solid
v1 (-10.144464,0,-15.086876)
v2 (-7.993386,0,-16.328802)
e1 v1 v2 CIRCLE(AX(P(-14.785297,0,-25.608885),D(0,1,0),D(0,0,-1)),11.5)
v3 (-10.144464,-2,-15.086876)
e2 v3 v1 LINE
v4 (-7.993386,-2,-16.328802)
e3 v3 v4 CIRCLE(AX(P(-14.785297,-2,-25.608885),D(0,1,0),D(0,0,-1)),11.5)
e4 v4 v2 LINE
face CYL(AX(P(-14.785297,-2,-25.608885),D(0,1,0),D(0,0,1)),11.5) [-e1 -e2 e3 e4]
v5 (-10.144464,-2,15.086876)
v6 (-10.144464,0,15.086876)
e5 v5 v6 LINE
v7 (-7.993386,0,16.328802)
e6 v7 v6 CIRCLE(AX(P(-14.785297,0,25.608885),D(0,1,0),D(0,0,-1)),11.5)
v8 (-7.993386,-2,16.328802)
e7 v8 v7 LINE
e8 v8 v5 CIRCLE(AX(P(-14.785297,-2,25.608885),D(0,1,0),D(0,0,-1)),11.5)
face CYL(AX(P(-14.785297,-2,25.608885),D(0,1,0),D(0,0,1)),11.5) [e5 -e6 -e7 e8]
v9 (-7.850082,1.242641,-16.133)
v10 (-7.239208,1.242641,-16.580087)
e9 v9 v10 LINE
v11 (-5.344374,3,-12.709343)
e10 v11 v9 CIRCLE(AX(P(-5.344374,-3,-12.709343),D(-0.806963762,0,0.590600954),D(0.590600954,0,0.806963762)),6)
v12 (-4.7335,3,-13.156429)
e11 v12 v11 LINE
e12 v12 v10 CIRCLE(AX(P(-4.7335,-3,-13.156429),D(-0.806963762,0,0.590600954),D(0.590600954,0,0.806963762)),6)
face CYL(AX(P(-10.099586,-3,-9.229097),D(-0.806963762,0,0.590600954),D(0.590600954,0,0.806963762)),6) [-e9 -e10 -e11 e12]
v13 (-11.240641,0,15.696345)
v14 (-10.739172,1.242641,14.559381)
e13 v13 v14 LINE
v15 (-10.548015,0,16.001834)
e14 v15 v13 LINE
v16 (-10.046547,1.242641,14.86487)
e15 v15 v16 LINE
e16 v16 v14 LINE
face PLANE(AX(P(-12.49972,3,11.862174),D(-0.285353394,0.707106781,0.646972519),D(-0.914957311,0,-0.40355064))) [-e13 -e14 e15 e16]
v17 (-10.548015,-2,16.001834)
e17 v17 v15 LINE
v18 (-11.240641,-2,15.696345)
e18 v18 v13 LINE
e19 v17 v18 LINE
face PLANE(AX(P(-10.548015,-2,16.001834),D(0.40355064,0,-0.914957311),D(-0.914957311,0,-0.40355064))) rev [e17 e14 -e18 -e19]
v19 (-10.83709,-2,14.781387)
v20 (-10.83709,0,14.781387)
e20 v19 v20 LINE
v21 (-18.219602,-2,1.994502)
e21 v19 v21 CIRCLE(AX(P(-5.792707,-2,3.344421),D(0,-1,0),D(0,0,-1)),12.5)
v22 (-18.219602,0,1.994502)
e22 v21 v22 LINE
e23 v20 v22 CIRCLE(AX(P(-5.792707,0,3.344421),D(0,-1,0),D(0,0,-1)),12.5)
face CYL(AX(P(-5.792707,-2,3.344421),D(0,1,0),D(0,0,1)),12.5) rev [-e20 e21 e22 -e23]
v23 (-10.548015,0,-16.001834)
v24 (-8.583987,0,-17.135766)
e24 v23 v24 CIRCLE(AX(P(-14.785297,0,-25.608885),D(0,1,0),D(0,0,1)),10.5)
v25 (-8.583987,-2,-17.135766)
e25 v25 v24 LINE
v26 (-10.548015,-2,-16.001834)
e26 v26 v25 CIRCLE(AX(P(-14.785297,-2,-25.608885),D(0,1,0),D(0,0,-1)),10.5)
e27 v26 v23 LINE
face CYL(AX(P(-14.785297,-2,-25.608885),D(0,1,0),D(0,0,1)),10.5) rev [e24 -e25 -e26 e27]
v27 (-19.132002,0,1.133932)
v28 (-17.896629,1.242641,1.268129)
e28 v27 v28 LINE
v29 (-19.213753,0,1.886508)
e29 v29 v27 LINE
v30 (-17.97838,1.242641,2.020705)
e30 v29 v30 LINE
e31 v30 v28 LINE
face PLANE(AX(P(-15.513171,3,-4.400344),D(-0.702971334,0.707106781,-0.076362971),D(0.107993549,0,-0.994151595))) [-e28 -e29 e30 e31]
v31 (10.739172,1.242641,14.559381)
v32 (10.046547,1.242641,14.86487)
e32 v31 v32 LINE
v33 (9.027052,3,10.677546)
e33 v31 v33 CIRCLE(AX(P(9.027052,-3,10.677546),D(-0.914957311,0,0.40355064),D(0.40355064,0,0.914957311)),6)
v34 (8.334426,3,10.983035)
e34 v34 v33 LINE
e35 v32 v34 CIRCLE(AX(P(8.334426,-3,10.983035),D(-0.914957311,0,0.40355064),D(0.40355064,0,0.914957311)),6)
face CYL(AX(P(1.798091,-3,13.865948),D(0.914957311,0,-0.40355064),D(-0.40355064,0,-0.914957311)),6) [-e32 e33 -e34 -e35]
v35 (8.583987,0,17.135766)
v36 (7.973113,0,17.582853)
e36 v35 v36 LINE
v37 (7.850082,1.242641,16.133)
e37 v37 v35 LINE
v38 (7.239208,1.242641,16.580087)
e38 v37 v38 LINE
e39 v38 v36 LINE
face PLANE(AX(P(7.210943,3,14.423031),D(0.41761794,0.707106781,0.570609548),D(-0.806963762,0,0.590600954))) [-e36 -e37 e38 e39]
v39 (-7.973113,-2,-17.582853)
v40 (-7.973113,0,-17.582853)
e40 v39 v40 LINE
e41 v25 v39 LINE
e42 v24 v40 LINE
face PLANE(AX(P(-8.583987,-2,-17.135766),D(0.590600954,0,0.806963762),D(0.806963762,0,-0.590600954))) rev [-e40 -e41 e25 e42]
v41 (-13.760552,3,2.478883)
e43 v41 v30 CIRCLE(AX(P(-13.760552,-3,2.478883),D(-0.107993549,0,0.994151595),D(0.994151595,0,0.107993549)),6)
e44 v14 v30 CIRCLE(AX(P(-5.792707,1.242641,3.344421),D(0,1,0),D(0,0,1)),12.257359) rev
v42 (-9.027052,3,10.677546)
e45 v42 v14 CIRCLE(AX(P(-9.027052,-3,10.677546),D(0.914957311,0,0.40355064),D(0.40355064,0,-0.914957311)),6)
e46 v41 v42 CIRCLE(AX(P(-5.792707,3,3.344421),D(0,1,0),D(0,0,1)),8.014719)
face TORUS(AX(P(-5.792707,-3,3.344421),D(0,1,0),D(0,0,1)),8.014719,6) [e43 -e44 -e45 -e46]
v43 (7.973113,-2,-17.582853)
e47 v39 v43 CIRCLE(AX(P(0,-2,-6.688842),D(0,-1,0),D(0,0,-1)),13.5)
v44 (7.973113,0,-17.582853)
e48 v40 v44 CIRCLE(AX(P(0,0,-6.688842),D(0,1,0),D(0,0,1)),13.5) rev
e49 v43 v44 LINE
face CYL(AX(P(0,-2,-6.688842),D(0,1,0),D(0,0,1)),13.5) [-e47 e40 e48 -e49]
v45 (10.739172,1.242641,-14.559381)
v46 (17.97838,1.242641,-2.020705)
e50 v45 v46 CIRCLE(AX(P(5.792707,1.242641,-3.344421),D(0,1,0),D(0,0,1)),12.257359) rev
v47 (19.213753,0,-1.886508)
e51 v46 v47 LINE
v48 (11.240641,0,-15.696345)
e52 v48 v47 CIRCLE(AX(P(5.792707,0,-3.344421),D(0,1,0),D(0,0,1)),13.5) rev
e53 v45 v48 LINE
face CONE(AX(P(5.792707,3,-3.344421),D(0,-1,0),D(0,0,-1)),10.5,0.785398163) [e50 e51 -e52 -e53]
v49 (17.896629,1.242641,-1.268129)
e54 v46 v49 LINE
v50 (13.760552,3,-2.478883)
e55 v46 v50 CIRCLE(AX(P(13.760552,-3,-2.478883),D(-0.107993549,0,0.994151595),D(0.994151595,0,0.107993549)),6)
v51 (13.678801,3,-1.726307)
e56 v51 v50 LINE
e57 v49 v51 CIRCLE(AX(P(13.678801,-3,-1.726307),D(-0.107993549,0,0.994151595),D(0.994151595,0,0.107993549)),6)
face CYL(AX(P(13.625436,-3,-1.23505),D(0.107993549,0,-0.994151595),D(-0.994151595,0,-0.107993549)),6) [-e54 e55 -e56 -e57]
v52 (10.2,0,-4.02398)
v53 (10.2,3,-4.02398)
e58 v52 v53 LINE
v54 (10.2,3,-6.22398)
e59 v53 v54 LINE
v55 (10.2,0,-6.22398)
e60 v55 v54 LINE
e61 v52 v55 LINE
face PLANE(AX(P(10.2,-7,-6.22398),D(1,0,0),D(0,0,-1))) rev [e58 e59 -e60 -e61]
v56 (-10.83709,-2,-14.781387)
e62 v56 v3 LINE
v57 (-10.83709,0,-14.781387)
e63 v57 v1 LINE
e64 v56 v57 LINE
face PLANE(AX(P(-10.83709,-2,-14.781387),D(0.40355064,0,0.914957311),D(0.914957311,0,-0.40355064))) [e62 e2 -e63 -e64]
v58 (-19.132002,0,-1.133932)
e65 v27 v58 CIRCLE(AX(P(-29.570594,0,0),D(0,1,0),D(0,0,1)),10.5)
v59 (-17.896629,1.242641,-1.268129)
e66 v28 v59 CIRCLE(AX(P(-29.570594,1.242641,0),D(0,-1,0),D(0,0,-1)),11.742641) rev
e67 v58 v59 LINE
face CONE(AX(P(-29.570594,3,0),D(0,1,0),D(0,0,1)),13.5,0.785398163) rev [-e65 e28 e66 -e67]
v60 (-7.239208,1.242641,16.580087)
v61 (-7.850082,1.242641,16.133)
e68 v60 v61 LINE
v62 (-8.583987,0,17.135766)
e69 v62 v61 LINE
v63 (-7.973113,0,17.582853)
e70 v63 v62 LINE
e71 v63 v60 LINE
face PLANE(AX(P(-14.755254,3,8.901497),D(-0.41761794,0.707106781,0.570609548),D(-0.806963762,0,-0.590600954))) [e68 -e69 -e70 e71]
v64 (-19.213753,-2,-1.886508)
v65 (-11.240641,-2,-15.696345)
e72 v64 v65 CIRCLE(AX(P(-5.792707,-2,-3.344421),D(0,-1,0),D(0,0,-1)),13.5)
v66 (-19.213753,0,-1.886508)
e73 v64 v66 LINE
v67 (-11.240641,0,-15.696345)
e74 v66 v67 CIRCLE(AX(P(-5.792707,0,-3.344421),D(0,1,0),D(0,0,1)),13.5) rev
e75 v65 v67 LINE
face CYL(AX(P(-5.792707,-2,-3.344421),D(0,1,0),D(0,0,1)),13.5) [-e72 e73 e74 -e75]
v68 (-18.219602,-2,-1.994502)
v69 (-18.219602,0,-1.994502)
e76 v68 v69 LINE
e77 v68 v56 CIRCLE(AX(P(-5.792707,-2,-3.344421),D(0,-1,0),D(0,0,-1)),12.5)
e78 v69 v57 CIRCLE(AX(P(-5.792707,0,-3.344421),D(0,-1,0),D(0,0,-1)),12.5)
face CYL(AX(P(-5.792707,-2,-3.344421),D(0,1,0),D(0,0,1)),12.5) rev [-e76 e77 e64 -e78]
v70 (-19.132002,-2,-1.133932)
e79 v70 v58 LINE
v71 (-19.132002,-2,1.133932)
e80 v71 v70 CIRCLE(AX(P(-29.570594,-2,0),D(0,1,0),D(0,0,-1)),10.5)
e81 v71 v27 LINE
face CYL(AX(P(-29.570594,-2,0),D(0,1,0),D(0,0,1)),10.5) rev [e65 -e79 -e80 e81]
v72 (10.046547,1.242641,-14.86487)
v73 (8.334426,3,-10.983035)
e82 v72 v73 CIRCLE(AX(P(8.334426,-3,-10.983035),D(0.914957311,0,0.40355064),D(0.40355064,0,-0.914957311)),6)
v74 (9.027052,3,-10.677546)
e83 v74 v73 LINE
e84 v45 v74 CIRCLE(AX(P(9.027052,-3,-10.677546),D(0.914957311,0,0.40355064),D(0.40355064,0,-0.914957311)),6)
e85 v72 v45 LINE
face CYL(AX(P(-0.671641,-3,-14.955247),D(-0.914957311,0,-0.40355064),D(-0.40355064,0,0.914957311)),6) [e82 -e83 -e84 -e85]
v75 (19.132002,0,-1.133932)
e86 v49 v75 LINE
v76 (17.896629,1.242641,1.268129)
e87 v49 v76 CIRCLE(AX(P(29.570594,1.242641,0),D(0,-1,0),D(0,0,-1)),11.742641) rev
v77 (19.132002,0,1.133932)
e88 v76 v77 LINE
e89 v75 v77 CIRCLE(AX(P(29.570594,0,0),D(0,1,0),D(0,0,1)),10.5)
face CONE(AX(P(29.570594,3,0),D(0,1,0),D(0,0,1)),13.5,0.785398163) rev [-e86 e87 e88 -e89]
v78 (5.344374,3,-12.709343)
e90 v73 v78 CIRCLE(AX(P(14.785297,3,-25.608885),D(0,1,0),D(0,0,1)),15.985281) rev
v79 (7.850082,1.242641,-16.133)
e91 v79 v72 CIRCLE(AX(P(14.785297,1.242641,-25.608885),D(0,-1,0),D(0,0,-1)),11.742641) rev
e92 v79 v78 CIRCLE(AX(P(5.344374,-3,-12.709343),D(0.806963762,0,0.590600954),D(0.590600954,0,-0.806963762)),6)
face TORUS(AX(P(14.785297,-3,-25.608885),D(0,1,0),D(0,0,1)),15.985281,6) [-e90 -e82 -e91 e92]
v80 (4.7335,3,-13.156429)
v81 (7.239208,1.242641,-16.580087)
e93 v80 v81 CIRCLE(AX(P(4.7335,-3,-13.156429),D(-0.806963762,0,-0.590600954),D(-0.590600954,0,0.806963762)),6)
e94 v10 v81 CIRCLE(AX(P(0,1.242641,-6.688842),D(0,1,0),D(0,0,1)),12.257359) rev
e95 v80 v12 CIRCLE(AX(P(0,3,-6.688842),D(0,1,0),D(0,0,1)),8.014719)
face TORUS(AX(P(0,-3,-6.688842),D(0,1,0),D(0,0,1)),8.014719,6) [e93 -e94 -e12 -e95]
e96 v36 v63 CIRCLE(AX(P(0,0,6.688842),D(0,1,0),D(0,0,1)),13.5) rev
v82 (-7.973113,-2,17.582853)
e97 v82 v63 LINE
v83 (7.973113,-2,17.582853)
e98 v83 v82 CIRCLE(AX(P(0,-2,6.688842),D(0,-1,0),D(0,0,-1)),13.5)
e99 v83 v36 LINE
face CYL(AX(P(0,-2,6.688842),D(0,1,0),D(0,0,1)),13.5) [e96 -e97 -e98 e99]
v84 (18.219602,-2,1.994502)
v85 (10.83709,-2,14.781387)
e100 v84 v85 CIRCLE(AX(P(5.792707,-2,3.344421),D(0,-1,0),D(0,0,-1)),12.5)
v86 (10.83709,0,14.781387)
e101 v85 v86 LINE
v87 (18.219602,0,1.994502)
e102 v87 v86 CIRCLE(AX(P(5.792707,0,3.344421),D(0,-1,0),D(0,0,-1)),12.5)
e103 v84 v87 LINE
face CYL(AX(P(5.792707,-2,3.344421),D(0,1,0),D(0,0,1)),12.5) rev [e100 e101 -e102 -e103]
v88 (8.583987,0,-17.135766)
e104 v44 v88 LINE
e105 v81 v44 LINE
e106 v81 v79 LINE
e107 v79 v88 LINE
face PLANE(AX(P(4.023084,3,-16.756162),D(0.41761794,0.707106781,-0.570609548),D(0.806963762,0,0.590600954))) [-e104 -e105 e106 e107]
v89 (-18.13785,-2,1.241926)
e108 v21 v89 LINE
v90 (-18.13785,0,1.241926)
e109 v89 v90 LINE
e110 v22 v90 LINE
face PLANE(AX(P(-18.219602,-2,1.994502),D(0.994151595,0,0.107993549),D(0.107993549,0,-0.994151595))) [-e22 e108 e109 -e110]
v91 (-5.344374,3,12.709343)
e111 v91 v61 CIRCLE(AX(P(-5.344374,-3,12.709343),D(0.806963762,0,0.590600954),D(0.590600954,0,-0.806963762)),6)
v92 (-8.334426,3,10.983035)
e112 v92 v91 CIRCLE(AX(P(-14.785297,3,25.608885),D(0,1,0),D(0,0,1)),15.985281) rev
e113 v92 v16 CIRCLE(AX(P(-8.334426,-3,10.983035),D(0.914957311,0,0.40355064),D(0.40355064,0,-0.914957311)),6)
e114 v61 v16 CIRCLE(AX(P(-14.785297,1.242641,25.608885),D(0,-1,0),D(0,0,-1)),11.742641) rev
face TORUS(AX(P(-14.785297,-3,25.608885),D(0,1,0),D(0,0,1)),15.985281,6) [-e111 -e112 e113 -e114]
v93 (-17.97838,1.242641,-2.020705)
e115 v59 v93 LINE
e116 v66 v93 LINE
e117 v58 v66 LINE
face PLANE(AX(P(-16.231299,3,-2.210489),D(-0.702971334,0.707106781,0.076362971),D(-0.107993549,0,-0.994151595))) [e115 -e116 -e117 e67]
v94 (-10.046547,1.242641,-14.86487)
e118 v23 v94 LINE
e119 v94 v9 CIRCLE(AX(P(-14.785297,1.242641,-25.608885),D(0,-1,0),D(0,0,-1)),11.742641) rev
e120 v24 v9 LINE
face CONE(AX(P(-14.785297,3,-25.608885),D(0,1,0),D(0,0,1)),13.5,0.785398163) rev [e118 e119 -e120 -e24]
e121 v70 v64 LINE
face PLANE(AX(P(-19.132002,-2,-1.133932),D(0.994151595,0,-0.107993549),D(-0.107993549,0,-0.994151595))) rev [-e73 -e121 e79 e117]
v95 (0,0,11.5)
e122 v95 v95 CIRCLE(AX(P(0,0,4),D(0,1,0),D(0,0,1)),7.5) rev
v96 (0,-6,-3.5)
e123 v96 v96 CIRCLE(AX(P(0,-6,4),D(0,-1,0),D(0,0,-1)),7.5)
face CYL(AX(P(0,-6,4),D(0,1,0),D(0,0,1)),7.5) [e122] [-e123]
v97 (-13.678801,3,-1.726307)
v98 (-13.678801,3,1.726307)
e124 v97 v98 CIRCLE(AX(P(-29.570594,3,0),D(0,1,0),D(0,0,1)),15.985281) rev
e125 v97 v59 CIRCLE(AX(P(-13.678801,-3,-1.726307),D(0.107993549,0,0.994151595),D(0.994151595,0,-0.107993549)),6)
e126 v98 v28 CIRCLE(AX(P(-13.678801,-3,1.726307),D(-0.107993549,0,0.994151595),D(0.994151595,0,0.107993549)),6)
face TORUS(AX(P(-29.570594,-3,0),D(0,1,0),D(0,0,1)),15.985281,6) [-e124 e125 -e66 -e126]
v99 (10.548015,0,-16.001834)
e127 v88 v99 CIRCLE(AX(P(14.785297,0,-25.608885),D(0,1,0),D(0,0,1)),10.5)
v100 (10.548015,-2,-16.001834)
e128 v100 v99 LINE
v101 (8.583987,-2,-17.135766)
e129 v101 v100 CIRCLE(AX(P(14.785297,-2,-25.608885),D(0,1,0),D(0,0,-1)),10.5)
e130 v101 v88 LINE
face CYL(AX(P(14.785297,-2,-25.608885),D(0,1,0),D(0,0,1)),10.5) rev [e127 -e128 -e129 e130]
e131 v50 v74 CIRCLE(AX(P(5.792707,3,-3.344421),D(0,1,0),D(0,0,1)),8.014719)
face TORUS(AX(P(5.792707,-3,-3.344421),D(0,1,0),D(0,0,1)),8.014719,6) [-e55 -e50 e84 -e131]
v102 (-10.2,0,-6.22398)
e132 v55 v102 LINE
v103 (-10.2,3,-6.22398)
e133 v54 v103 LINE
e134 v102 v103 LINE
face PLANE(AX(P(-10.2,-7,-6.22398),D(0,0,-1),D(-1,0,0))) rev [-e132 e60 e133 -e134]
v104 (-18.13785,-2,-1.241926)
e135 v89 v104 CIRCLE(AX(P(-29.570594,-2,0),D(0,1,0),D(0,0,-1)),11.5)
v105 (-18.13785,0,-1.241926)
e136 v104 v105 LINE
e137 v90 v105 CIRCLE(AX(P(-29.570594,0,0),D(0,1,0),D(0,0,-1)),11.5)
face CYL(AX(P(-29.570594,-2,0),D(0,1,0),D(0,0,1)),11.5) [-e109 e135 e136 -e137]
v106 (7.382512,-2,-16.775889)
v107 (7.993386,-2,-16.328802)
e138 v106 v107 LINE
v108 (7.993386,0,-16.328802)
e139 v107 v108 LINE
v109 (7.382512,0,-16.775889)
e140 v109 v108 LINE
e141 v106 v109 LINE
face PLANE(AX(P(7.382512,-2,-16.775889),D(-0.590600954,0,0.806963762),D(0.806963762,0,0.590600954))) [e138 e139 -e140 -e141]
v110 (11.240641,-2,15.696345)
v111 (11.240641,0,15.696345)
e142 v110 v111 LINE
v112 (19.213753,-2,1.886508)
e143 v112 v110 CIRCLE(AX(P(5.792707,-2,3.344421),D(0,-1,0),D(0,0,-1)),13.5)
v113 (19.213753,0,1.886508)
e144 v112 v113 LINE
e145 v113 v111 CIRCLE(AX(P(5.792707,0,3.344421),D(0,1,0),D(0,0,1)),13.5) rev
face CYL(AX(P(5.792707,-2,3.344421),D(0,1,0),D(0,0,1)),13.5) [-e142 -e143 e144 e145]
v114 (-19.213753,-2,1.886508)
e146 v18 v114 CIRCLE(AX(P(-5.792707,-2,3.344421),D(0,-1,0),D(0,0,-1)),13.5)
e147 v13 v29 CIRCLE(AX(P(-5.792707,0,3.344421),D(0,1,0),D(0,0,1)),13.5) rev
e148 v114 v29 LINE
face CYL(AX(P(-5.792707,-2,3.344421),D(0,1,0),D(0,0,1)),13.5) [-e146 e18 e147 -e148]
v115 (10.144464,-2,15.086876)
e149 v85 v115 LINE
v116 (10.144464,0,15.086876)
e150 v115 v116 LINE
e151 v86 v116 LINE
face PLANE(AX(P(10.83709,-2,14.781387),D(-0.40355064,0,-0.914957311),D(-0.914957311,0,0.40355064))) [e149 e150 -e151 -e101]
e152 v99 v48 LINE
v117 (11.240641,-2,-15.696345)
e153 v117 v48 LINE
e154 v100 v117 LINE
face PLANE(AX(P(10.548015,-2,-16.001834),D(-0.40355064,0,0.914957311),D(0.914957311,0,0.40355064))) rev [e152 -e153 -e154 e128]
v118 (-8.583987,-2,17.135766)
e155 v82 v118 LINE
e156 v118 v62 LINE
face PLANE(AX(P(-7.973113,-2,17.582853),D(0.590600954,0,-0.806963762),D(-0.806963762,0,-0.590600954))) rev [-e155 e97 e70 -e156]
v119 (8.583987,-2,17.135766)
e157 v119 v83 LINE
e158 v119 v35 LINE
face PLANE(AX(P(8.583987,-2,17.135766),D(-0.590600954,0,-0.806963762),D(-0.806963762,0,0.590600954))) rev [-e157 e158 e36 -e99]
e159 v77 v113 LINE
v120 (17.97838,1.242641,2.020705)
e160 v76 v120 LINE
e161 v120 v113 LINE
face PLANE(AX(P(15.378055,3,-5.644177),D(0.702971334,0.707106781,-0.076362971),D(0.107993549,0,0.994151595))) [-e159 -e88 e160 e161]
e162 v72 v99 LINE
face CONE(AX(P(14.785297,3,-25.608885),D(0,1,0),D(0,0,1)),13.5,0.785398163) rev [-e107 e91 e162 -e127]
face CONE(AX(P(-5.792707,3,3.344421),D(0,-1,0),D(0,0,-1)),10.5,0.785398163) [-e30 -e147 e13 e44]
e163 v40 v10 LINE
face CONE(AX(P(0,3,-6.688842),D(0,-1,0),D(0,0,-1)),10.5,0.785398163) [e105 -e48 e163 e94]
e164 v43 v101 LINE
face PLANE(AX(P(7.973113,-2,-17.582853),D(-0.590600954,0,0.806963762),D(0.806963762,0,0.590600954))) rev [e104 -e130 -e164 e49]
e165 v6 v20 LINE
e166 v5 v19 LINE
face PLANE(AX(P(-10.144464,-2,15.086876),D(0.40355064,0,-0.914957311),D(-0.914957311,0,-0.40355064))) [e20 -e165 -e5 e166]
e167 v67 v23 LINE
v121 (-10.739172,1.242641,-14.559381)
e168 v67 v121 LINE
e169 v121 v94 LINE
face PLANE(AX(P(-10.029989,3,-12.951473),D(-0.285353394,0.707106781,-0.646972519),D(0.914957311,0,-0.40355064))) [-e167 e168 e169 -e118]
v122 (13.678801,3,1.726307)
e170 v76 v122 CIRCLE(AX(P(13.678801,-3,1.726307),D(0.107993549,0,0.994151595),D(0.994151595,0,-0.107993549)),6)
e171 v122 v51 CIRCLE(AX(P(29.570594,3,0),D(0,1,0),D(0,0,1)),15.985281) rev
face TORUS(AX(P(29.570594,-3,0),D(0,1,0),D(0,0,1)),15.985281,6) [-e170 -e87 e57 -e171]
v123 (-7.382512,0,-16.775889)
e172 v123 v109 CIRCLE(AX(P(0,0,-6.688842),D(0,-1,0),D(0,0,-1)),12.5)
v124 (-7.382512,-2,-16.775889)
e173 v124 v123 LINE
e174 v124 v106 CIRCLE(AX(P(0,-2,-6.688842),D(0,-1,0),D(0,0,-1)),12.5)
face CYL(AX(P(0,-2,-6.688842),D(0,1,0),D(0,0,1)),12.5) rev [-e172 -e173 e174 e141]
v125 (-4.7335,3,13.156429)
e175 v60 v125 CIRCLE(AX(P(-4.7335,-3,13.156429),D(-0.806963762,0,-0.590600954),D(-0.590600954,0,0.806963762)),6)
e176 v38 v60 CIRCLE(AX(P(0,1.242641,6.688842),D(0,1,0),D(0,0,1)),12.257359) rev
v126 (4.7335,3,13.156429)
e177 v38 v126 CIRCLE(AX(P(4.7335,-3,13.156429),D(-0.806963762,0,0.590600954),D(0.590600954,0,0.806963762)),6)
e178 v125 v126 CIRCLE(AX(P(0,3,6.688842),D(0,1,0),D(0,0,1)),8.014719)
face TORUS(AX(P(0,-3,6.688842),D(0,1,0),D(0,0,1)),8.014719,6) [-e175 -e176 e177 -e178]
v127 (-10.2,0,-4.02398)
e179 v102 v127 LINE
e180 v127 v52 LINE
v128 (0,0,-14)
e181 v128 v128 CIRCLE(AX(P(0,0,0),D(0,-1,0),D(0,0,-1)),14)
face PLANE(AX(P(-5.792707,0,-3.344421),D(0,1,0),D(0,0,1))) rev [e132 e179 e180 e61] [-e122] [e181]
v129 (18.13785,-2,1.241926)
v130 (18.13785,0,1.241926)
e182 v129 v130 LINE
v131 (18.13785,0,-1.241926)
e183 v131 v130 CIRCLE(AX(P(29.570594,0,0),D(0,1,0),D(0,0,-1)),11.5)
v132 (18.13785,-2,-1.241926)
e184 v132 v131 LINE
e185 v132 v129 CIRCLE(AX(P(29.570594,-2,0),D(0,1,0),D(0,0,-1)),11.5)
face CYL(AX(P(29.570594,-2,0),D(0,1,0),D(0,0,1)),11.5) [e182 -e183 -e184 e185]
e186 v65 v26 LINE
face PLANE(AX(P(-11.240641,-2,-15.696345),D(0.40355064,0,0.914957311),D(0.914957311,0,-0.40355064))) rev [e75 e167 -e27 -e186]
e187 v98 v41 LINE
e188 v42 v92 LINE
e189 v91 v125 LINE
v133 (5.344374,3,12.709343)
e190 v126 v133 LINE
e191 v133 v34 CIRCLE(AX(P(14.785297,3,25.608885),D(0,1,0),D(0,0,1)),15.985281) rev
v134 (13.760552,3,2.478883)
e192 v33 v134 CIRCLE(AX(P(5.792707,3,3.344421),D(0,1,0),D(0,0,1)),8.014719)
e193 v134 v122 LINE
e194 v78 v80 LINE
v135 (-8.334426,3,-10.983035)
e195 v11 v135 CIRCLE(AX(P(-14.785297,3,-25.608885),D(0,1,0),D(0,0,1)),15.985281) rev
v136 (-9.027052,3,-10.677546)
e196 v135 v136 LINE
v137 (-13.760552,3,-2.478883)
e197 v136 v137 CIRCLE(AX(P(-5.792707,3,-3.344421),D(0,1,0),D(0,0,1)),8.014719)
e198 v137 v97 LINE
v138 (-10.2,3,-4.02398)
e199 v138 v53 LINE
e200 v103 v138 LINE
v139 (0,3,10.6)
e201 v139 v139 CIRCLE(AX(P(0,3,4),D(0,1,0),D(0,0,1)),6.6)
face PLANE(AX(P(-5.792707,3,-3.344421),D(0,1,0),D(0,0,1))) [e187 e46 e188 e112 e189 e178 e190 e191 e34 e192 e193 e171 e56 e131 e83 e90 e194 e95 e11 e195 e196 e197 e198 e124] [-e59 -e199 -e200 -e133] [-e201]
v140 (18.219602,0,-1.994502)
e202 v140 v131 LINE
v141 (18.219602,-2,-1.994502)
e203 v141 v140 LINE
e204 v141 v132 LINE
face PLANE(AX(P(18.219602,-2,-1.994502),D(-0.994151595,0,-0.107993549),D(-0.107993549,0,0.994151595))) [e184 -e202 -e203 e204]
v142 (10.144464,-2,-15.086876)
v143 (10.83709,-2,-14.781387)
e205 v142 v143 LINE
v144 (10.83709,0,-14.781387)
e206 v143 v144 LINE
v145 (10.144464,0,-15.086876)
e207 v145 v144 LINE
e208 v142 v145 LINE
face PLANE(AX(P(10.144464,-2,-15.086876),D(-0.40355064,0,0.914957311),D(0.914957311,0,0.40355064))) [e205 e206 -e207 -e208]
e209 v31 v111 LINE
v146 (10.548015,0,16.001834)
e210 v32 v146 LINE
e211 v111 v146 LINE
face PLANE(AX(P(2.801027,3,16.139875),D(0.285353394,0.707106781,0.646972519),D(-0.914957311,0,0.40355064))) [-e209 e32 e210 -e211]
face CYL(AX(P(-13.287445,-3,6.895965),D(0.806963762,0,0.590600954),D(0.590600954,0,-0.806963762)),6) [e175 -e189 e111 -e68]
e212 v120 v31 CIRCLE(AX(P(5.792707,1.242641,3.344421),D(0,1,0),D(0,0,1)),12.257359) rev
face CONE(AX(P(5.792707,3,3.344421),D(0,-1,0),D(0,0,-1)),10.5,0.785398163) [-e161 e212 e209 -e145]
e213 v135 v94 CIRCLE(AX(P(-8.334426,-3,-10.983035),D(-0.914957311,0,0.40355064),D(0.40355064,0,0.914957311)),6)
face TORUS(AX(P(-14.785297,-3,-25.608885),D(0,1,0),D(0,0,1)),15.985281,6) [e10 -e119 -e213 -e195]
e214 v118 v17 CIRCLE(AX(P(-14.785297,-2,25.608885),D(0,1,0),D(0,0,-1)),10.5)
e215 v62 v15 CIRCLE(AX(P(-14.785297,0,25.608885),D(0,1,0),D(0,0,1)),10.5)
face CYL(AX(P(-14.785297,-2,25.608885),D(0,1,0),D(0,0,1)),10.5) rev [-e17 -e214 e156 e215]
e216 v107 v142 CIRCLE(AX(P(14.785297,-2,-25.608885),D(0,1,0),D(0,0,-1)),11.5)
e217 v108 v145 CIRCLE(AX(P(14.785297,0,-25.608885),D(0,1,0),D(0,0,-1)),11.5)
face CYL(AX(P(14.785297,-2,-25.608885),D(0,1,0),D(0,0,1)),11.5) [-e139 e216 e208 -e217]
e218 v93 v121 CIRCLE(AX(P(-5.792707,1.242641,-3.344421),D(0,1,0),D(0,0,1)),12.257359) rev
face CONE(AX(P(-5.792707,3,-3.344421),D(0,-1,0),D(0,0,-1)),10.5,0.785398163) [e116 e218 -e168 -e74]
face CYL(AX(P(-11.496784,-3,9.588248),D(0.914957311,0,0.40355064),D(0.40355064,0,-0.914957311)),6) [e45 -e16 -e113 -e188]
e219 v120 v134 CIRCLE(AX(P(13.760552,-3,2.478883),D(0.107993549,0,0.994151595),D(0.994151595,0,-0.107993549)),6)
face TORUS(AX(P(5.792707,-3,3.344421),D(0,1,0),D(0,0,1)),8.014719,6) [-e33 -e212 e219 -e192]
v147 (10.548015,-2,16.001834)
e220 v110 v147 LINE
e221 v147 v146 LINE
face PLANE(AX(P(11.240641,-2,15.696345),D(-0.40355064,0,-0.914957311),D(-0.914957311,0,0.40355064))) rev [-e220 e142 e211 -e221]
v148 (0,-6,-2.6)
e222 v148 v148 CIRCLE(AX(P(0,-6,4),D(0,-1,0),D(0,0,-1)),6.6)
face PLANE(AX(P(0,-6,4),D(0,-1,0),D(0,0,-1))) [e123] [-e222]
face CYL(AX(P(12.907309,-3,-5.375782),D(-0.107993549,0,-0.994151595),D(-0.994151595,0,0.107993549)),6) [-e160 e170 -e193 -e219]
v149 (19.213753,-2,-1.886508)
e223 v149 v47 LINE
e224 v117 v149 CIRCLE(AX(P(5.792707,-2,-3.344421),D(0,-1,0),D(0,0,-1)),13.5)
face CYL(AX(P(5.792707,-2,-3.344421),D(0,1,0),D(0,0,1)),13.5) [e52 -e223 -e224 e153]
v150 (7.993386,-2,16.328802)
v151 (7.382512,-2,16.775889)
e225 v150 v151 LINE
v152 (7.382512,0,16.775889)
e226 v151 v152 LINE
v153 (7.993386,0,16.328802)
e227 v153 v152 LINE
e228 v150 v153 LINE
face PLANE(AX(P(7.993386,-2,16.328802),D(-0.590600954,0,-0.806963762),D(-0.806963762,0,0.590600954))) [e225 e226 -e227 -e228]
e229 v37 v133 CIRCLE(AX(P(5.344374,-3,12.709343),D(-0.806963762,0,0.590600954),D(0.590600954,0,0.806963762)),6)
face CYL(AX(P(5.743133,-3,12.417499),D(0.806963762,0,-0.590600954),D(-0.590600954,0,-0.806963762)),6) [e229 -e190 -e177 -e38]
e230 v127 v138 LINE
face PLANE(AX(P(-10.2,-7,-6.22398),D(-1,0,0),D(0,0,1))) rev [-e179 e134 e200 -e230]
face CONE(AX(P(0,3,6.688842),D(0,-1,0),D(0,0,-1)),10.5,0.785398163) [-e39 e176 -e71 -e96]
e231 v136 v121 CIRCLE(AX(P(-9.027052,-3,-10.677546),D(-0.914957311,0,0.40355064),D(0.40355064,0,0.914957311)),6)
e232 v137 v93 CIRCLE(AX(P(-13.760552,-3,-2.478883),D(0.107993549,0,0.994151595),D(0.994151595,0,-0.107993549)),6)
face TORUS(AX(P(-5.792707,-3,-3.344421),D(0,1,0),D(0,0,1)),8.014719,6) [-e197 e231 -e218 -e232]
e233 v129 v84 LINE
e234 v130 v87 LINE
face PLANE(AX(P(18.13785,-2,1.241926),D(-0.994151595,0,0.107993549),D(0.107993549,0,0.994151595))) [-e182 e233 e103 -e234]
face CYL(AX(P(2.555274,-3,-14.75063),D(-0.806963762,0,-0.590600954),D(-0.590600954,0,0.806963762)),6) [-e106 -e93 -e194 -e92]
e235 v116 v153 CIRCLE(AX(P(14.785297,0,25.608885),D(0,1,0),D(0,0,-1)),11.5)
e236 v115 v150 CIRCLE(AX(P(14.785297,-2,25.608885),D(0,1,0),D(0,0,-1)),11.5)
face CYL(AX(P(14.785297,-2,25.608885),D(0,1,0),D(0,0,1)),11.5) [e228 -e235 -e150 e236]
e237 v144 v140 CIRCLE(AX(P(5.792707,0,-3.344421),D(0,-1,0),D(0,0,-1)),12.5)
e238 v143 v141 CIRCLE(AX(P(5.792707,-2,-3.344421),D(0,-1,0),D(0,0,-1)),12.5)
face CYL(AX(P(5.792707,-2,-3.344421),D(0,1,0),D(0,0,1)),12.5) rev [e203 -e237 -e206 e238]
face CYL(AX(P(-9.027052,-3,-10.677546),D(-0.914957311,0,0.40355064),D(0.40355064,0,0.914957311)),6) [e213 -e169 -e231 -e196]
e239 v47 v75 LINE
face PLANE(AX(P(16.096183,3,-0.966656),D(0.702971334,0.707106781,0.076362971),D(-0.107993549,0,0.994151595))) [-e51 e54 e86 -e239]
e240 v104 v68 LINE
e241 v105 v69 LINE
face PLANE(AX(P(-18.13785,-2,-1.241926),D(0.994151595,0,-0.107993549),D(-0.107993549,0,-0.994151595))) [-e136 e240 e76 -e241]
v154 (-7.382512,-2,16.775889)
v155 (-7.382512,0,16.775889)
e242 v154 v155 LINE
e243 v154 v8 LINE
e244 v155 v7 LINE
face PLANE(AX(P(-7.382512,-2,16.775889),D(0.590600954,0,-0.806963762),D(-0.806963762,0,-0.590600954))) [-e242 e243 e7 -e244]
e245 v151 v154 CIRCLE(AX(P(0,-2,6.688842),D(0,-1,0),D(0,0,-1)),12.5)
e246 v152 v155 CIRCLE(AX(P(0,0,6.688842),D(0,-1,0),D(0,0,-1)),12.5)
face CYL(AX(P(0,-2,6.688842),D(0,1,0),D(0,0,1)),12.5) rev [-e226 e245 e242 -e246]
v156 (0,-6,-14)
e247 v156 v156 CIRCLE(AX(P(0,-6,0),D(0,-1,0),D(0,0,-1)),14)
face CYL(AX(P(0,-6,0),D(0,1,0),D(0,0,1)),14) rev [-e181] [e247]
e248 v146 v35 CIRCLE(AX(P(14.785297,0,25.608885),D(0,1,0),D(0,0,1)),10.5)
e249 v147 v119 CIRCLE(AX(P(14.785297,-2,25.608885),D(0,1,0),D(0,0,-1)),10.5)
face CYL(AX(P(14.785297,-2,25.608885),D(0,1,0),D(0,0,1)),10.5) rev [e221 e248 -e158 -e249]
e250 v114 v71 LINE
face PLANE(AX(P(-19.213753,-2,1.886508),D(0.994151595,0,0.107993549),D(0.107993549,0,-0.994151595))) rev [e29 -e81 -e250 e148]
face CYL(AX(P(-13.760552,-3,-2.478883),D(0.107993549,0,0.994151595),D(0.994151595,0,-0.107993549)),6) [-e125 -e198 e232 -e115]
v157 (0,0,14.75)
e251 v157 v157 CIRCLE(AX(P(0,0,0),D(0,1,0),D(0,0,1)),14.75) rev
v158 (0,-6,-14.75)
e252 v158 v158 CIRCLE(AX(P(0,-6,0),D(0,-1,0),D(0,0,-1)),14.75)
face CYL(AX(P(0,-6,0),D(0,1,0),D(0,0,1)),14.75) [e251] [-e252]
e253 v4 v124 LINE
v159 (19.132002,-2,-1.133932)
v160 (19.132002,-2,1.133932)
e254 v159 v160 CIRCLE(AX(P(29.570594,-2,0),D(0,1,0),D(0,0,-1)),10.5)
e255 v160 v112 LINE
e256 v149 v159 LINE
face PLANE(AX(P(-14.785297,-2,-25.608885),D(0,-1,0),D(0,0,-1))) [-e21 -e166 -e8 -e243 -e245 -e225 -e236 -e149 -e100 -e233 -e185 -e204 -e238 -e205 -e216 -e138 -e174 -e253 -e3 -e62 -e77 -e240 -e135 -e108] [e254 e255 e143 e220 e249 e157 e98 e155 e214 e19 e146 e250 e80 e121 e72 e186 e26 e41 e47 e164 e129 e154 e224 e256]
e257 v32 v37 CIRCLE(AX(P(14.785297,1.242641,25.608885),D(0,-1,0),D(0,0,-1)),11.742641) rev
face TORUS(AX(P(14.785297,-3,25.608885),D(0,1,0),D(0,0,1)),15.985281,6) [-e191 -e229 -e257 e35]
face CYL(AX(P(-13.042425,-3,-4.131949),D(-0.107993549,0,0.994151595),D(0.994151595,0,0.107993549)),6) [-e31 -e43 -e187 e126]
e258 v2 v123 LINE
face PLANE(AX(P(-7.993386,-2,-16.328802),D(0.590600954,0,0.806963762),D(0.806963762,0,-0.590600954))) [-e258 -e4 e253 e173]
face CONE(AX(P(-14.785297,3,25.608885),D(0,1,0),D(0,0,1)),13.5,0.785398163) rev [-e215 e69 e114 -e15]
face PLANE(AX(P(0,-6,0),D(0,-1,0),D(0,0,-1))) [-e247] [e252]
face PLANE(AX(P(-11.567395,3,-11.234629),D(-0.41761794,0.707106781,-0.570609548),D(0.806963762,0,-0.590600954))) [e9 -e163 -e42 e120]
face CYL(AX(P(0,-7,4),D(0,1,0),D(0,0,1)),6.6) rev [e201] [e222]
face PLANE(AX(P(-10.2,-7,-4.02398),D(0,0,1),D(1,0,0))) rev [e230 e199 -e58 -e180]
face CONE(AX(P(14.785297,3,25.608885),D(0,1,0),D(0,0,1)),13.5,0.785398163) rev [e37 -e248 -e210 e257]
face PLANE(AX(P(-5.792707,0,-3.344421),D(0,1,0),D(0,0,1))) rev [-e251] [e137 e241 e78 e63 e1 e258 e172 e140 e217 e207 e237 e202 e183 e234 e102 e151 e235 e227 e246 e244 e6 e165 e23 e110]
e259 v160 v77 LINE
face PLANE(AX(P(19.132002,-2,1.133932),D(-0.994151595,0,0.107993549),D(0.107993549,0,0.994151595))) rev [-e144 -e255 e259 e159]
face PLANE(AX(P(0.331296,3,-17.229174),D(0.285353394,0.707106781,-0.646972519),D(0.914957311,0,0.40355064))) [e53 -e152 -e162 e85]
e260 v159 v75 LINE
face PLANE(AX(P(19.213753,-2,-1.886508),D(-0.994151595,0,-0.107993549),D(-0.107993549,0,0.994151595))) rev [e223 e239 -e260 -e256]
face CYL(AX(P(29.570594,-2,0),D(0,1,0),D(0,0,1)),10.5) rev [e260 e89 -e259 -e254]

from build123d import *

# Parameters (mm, degrees)
EXTRUDE_1_DEPTH     = 3
CHAMFER_1_SIZE      = 4.5
SKETCH_3_R          = 14.75
SKETCH_3_R_2        = 14
EXTRUDE_2_DEPTH     = 6
FILLET_1_R          = 6
SKETCH_4_R          = 6.6
SKETCH_4_W          = 20.4
SKETCH_4_H          = 2.2
CUT_EXTRUDE_1_DEPTH = 10
SKETCH_5_R          = 7.5
SKETCH_5_R_2        = 6.6
EXTRUDE_3_DEPTH     = 6
EXTRUDE_4_DEPTH     = 2


with BuildPart() as part:
    # 草圖1 → 填料-伸長1 (new body)
    with BuildSketch(Plane(origin=(0, 0, 0), x_dir=(1, 0, 0), z_dir=(0, 1, 0))):
        with BuildLine():
            Line((-20.704980807, 1.724517645), (-20.623229371, 0.971941941))
            ThreePointArc((-20.623229371, 0.971941941), (-20.570593724, 0), (-20.623229371, -0.971941941))
            Line((-20.623229371, -0.971941941), (-20.704980807, -1.724517645))
            ThreePointArc((-20.704980807, -1.724517645), (-18.783087943, -10.84442088), (-11.845966493, -17.068780542))
            Line((-11.845966493, -17.068780542), (-11.153341097, -17.374269573))
            ThreePointArc((-11.153341097, -17.374269573), (-10.285296862, -17.814656736), (-9.469888273, -18.346211514))
            Line((-9.469888273, -18.346211514), (-8.859014314, -18.793298186))
            ThreePointArc((-8.859014314, -18.793298186), (0, -21.68884176), (8.859014314, -18.793298186))
            Line((8.859014314, -18.793298186), (9.469888273, -18.346211514))
            ThreePointArc((9.469888273, -18.346211514), (10.285296862, -17.814656736), (11.153341097, -17.374269573))
            Line((11.153341097, -17.374269573), (11.845966493, -17.068780542))
            ThreePointArc((11.845966493, -17.068780542), (18.783087943, -10.84442088), (20.704980807, -1.724517645))
            Line((20.704980807, -1.724517645), (20.623229371, -0.971941941))
            ThreePointArc((20.623229371, -0.971941941), (20.570593724, 0), (20.623229371, 0.971941941))
            Line((20.623229371, 0.971941941), (20.704980807, 1.724517645))
            ThreePointArc((20.704980807, 1.724517645), (18.783087943, 10.84442088), (11.845966493, 17.068780542))
            Line((11.845966493, 17.068780542), (11.153341097, 17.374269573))
            ThreePointArc((11.153341097, 17.374269573), (10.285296862, 17.814656736), (9.469888273, 18.346211514))
            Line((9.469888273, 18.346211514), (8.859014314, 18.793298186))
            ThreePointArc((8.859014314, 18.793298186), (0, 21.68884176), (-8.859014314, 18.793298186))
            Line((-8.859014314, 18.793298186), (-9.469888273, 18.346211514))
            ThreePointArc((-9.469888273, 18.346211514), (-10.285296862, 17.814656736), (-11.153341097, 17.374269573))
            Line((-11.153341097, 17.374269573), (-11.845966493, 17.068780542))
            ThreePointArc((-11.845966493, 17.068780542), (-18.783087943, 10.84442088), (-20.704980807, 1.724517645))
        make_face()
    extrude(amount=EXTRUDE_1_DEPTH)

    # 導角1
    # the kernel refuses this chamfer: 4.5 mm, written as the material it takes off along each edge
    with BuildSketch(Plane(origin=(0, 3, -6.68884176), x_dir=(0.5906009542707515, 0, -0.806963761772781), z_dir=(0.806963761772781, 0, 0.5906009542707515))) as chamfer_1_piece_1:
        Polygon((15, -CHAMFER_1_SIZE), (15 - CHAMFER_1_SIZE, 0), (15, 0), align=None)
    revolve(axis=Axis((0, 3, -6.68884176), (0, 1, 0)), revolution_arc=72.399330687, mode=Mode.SUBTRACT)
    with BuildSketch(Plane(origin=(-8.859014314, 3, -18.793298186), x_dir=(-0.01623909096472242, -0.9996219169112969, -0.022188176022919864), z_dir=(-0.8069637617728046, 0, 0.5906009542707192)), Plane(origin=(9.469888273, 3, -18.346211514), x_dir=(0.016239090964723243, -0.9996219169112966, -0.02218817602291905), z_dir=(-0.80696376177278, 0, -0.590600954270753)), Plane(origin=(-11.153341097, 3, -17.374269573), x_dir=(-0.011095978617127196, -0.9996219169112966, -0.025157553321276), z_dir=(-0.9149573107841905, 0, 0.4035506404933121)), Plane(origin=(11.845966493, 3, -17.068780542), x_dir=(0.01109597861712818, -0.9996219169112969, -0.025157553321275908), z_dir=(-0.9149573107841767, 0, -0.4035506404933432)), Plane(origin=(-20.704980807, 3, -1.724517645), x_dir=(-0.027335069581850155, -0.9996219169112966, 0.002969377298356834), z_dir=(0.10799354901140278, 0, 0.994151594764059)), Plane(origin=(20.623229371, 3, -0.971941941), x_dir=(0.027335069581850155, -0.9996219169112966, 0.002969377298356732), z_dir=(0.10799354901139908, 0, -0.9941515947640595)), Plane(origin=(-20.623229371, 3, 0.971941941), x_dir=(-0.027335069581850155, -0.9996219169112966, -0.0029693772983569343), z_dir=(-0.10799354901140637, 0, 0.9941515947640586)), Plane(origin=(20.704980807, 3, 1.724517645), x_dir=(0.027335069581850162, -0.9996219169112966, -0.0029693772983558834), z_dir=(-0.10799354901136858, 0, -0.9941515947640628)), Plane(origin=(-11.845966493, 3, 17.068780542), x_dir=(-0.011095978617126995, -0.9996219169112966, 0.025157553321276088), z_dir=(0.9149573107841937, 0, 0.40355064049330475)), Plane(origin=(11.153341097, 3, 17.374269573), x_dir=(0.01109597861712765, -0.9996219169112969, 0.025157553321275974), z_dir=(0.9149573107841842, 0, -0.40355064049332623)), Plane(origin=(-9.469888273, 3, 18.346211514), x_dir=(-0.016239090964723056, -0.9996219169112966, 0.022188176022919188), z_dir=(0.8069637617727851, 0, 0.5906009542707462)), Plane(origin=(8.859014314, 3, 18.793298186), x_dir=(0.016239090964721894, -0.9996219169112969, 0.022188176022919965), z_dir=(0.8069637617728149, 0, -0.5906009542707051))) as chamfer_1_piece_2:
        Polygon((CHAMFER_1_SIZE * 0.999621916911, CHAMFER_1_SIZE * 0.0274958766106), (-CHAMFER_1_SIZE * 0.0274958766106, CHAMFER_1_SIZE * 0.999621916911), (0, 0), align=None)
    extrude(amount=0.757002964, mode=Mode.SUBTRACT)
    with BuildSketch(Plane(origin=(-14.785296862, 3, -25.60888537), x_dir=(0.5906009542707458, 0, 0.8069637617727853), z_dir=(0.8069637617727853, 0, -0.5906009542707458))) as chamfer_1_piece_3:
        Polygon((9, CHAMFER_1_SIZE), (9 + CHAMFER_1_SIZE, 0), (9, 0), align=None)
    revolve(axis=Axis((-14.785296862, 3, -25.60888537), (0, -1, 0)), revolution_arc=12.399330687, mode=Mode.SUBTRACT)
    with BuildSketch(Plane(origin=(14.785296862, 3, -25.60888537), x_dir=(-0.4035506404933164, 0, 0.9149573107841885), z_dir=(0.9149573107841885, 0, 0.4035506404933164))) as chamfer_1_piece_4:
        Polygon((9, CHAMFER_1_SIZE), (9 + CHAMFER_1_SIZE, 0), (9, 0), align=None)
    revolve(axis=Axis((14.785296862, 3, -25.60888537), (0, -1, 0)), revolution_arc=12.399330687, mode=Mode.SUBTRACT)
    with BuildSketch(Plane(origin=(-5.792706886, 3, -3.34442088), x_dir=(-0.40355064049330586, 0, -0.9149573107841932), z_dir=(0.9149573107841932, 0, -0.40355064049330586))) as chamfer_1_piece_5:
        Polygon((15, -CHAMFER_1_SIZE), (15 - CHAMFER_1_SIZE, 0), (15, 0), align=None)
    revolve(axis=Axis((-5.792706886, 3, -3.34442088), (0, 1, 0)), revolution_arc=72.399330687, mode=Mode.SUBTRACT)
    with BuildSketch(Plane(origin=(5.792706886, 3, -3.34442088), x_dir=(0.9941515947640585, 0, 0.10799354901140852), z_dir=(-0.10799354901140852, 0, 0.9941515947640585))) as chamfer_1_piece_6:
        Polygon((15, -CHAMFER_1_SIZE), (15 - CHAMFER_1_SIZE, 0), (15, 0), align=None)
    revolve(axis=Axis((5.792706886, 3, -3.34442088), (0, 1, 0)), revolution_arc=72.399330687, mode=Mode.SUBTRACT)
    with BuildSketch(Plane(origin=(-29.570593724, 3, 0), x_dir=(0.994151594764055, 0, -0.10799354901143883), z_dir=(-0.10799354901143883, 0, -0.994151594764055))) as chamfer_1_piece_7:
        Polygon((9, CHAMFER_1_SIZE), (9 + CHAMFER_1_SIZE, 0), (9, 0), align=None)
    revolve(axis=Axis((-29.570593724, 3, 0), (0, -1, 0)), revolution_arc=12.399330687, mode=Mode.SUBTRACT)
    with BuildSketch(Plane(origin=(29.570593724, 3, 0), x_dir=(-0.9941515947640606, 0, 0.10799354901138845), z_dir=(0.10799354901138845, 0, 0.9941515947640606))) as chamfer_1_piece_8:
        Polygon((9, CHAMFER_1_SIZE), (9 + CHAMFER_1_SIZE, 0), (9, 0), align=None)
    revolve(axis=Axis((29.570593724, 3, 0), (0, -1, 0)), revolution_arc=12.399330687, mode=Mode.SUBTRACT)
    with BuildSketch(Plane(origin=(-5.792706886, 3, 3.34442088), x_dir=(-0.9941515947640578, 0, -0.10799354901141427), z_dir=(0.10799354901141427, 0, -0.9941515947640578))) as chamfer_1_piece_9:
        Polygon((15, -CHAMFER_1_SIZE), (15 - CHAMFER_1_SIZE, 0), (15, 0), align=None)
    revolve(axis=Axis((-5.792706886, 3, 3.34442088), (0, 1, 0)), revolution_arc=72.399330687, mode=Mode.SUBTRACT)
    with BuildSketch(Plane(origin=(5.792706886, 3, 3.34442088), x_dir=(0.4035506404933115, 0, 0.9149573107841906), z_dir=(-0.9149573107841906, 0, 0.4035506404933115))) as chamfer_1_piece_10:
        Polygon((15, -CHAMFER_1_SIZE), (15 - CHAMFER_1_SIZE, 0), (15, 0), align=None)
    revolve(axis=Axis((5.792706886, 3, 3.34442088), (0, 1, 0)), revolution_arc=72.399330687, mode=Mode.SUBTRACT)
    with BuildSketch(Plane(origin=(-14.785296862, 3, 25.60888537), x_dir=(0.40355064049333084, 0, -0.9149573107841821), z_dir=(-0.9149573107841821, 0, -0.40355064049333084))) as chamfer_1_piece_11:
        Polygon((9, CHAMFER_1_SIZE), (9 + CHAMFER_1_SIZE, 0), (9, 0), align=None)
    revolve(axis=Axis((-14.785296862, 3, 25.60888537), (0, -1, 0)), revolution_arc=12.399330687, mode=Mode.SUBTRACT)
    with BuildSketch(Plane(origin=(14.785296862, 3, 25.60888537), x_dir=(-0.5906009542707462, 0, -0.8069637617727851), z_dir=(-0.8069637617727851, 0, 0.5906009542707462))) as chamfer_1_piece_12:
        Polygon((9, CHAMFER_1_SIZE), (9 + CHAMFER_1_SIZE, 0), (9, 0), align=None)
    revolve(axis=Axis((14.785296862, 3, 25.60888537), (0, -1, 0)), revolution_arc=12.399330687, mode=Mode.SUBTRACT)
    with BuildSketch(Plane(origin=(0, 3, 6.68884176), x_dir=(-0.5906009542707469, 0, 0.8069637617727844), z_dir=(-0.8069637617727844, 0, -0.5906009542707469))) as chamfer_1_piece_13:
        Polygon((15, -CHAMFER_1_SIZE), (15 - CHAMFER_1_SIZE, 0), (15, 0), align=None)
    revolve(axis=Axis((0, 3, 6.68884176), (0, 1, 0)), revolution_arc=72.399330687, mode=Mode.SUBTRACT)

    # 草圖3 → 填料-伸長2 (add)
    with BuildSketch(Plane.XZ):
        with Locations(Location((0, 0, 0), (0, 0, 90))):
            Circle(SKETCH_3_R)
        with Locations(Location((0, 0, 0), (0, 0, 270))):
            Circle(SKETCH_3_R_2, mode=Mode.SUBTRACT)
    extrude(amount=EXTRUDE_2_DEPTH)

    # 圓角1
    fillet_1_edges = [part.edges().sort_by_distance(p)[0] for p in [
        (0, 3, 17.18884176),
        (6.506746999, 3, 14.938417922),
        (-6.506746999, 3, 14.938417922),
        (8.035296862, 3, 13.917542418),
        (-8.035296862, 3, 13.917542418),
        (9.683675913, 3, 13.104217159),
        (-9.683675913, 3, 13.104217159),
        (14.885973626, 3, 8.59442088),
        (-14.885973626, 3, 8.59442088),
        (16.190422913, 3, 1.834200763),
        (-16.190422913, 3, 1.834200763),
        (16.070593724, 3, 0),
        (-16.070593724, 3, 0),
        (16.190422913, 3, -1.834200763),
        (-16.190422913, 3, -1.834200763),
        (14.885973626, 3, -8.59442088),
        (-14.885973626, 3, -8.59442088),
        (9.683675913, 3, -13.104217159),
        (-9.683675913, 3, -13.104217159),
        (8.035296862, 3, -13.917542418),
        (-8.035296862, 3, -13.917542418),
        (6.506746999, 3, -14.938417922),
        (-6.506746999, 3, -14.938417922),
        (0, 3, -17.18884176),
    ]]
    fillet(fillet_1_edges, radius=FILLET_1_R)

    # 草圖4 → 除料-伸長1 (cut)
    with BuildSketch(Plane(origin=(0, 3, 0), x_dir=(1, 0, 0), z_dir=(0, 1, 0))):
        with Locations(Location((0, -4, 0), (0, 0, 270))):
            Circle(SKETCH_4_R)
        with Locations((0, 5.12397969)):
            Rectangle(SKETCH_4_W, SKETCH_4_H)
    extrude(amount=-CUT_EXTRUDE_1_DEPTH, mode=Mode.SUBTRACT)

    # 草圖5 → 填料-伸長3 (add)
    with BuildSketch(Plane.XZ):
        with Locations(Location((0, 4, 0), (0, 0, 90))):
            Circle(SKETCH_5_R)
        with Locations(Location((0, 4, 0), (0, 0, 90))):
            Circle(SKETCH_5_R_2, mode=Mode.SUBTRACT)
    extrude(amount=EXTRUDE_3_DEPTH)

    # 草圖6 → 填料-伸長4 (add)
    with BuildSketch(Plane.XZ):
        with BuildLine():
            Line((-8.583986842, -17.135765871), (-7.973112883, -17.582852544))
            ThreePointArc((-7.973112883, -17.582852544), (0, -20.18884176), (7.973112883, -17.582852544))
            Line((7.973112883, -17.582852544), (8.583986842, -17.135765871))
            ThreePointArc((8.583986842, -17.135765871), (9.535296862, -16.51561863), (10.548015137, -16.001833606))
            Line((10.548015137, -16.001833606), (11.240640533, -15.696344575))
            ThreePointArc((11.240640533, -15.696344575), (17.484049837, -10.09442088), (19.213753415, -1.886507968))
            Line((19.213753415, -1.886507968), (19.132001979, -1.133932265))
            ThreePointArc((19.132001979, -1.133932265), (19.070593724, 0), (19.132001979, 1.133932265))
            Line((19.132001979, 1.133932265), (19.213753415, 1.886507968))
            ThreePointArc((19.213753415, 1.886507968), (17.484049837, 10.09442088), (11.240640533, 15.696344575))
            Line((11.240640533, 15.696344575), (10.548015137, 16.001833606))
            ThreePointArc((10.548015137, 16.001833606), (9.535296862, 16.51561863), (8.583986842, 17.135765871))
            Line((8.583986842, 17.135765871), (7.973112883, 17.582852544))
            ThreePointArc((7.973112883, 17.582852544), (0, 20.18884176), (-7.973112883, 17.582852544))
            Line((-7.973112883, 17.582852544), (-8.583986842, 17.135765871))
            ThreePointArc((-8.583986842, 17.135765871), (-9.535296862, 16.51561863), (-10.548015137, 16.001833606))
            Line((-10.548015137, 16.001833606), (-11.240640533, 15.696344575))
            ThreePointArc((-11.240640533, 15.696344575), (-17.484049837, 10.09442088), (-19.213753415, 1.886507968))
            Line((-19.213753415, 1.886507968), (-19.132001979, 1.133932265))
            ThreePointArc((-19.132001979, 1.133932265), (-19.070593724, 0), (-19.132001979, -1.133932265))
            Line((-19.132001979, -1.133932265), (-19.213753415, -1.886507968))
            ThreePointArc((-19.213753415, -1.886507968), (-17.484049837, -10.09442088), (-11.240640533, -15.696344575))
            Line((-11.240640533, -15.696344575), (-10.548015137, -16.001833606))
            ThreePointArc((-10.548015137, -16.001833606), (-9.535296862, -16.51561863), (-8.583986842, -17.135765871))
        make_face()
        with BuildLine():
            Line((-7.993385888, -16.328802109), (-7.382511928, -16.775888782))
            ThreePointArc((-7.382511928, -16.775888782), (0, -19.18884176), (7.382511928, -16.775888782))
            Line((7.382511928, -16.775888782), (7.993385888, -16.328802109))
            ThreePointArc((7.993385888, -16.328802109), (9.035296862, -15.649593226), (10.144464496, -15.086876296))
            Line((10.144464496, -15.086876296), (10.837089892, -14.781387265))
            ThreePointArc((10.837089892, -14.781387265), (16.618024433, -9.59442088), (18.21960182, -1.994501517))
            Line((18.21960182, -1.994501517), (18.137850384, -1.241925814))
            ThreePointArc((18.137850384, -1.241925814), (18.070593724, 0), (18.137850384, 1.241925814))
            Line((18.137850384, 1.241925814), (18.21960182, 1.994501517))
            ThreePointArc((18.21960182, 1.994501517), (16.618024433, 9.59442088), (10.837089892, 14.781387265))
            Line((10.837089892, 14.781387265), (10.144464496, 15.086876296))
            ThreePointArc((10.144464496, 15.086876296), (9.035296862, 15.649593226), (7.993385888, 16.328802109))
            Line((7.993385888, 16.328802109), (7.382511928, 16.775888782))
            ThreePointArc((7.382511928, 16.775888782), (0, 19.18884176), (-7.382511928, 16.775888782))
            Line((-7.382511928, 16.775888782), (-7.993385888, 16.328802109))
            ThreePointArc((-7.993385888, 16.328802109), (-9.035296862, 15.649593226), (-10.144464496, 15.086876296))
            Line((-10.144464496, 15.086876296), (-10.837089892, 14.781387265))
            ThreePointArc((-10.837089892, 14.781387265), (-16.618024433, 9.59442088), (-18.21960182, 1.994501517))
            Line((-18.21960182, 1.994501517), (-18.137850384, 1.241925814))
            ThreePointArc((-18.137850384, 1.241925814), (-18.070593724, 0), (-18.137850384, -1.241925814))
            Line((-18.137850384, -1.241925814), (-18.21960182, -1.994501517))
            ThreePointArc((-18.21960182, -1.994501517), (-16.618024433, -9.59442088), (-10.837089892, -14.781387265))
            Line((-10.837089892, -14.781387265), (-10.144464496, -15.086876296))
            ThreePointArc((-10.144464496, -15.086876296), (-9.035296862, -15.649593226), (-7.993385888, -16.328802109))
        make_face(mode=Mode.SUBTRACT)
    extrude(amount=EXTRUDE_4_DEPTH)


solid = part.part
